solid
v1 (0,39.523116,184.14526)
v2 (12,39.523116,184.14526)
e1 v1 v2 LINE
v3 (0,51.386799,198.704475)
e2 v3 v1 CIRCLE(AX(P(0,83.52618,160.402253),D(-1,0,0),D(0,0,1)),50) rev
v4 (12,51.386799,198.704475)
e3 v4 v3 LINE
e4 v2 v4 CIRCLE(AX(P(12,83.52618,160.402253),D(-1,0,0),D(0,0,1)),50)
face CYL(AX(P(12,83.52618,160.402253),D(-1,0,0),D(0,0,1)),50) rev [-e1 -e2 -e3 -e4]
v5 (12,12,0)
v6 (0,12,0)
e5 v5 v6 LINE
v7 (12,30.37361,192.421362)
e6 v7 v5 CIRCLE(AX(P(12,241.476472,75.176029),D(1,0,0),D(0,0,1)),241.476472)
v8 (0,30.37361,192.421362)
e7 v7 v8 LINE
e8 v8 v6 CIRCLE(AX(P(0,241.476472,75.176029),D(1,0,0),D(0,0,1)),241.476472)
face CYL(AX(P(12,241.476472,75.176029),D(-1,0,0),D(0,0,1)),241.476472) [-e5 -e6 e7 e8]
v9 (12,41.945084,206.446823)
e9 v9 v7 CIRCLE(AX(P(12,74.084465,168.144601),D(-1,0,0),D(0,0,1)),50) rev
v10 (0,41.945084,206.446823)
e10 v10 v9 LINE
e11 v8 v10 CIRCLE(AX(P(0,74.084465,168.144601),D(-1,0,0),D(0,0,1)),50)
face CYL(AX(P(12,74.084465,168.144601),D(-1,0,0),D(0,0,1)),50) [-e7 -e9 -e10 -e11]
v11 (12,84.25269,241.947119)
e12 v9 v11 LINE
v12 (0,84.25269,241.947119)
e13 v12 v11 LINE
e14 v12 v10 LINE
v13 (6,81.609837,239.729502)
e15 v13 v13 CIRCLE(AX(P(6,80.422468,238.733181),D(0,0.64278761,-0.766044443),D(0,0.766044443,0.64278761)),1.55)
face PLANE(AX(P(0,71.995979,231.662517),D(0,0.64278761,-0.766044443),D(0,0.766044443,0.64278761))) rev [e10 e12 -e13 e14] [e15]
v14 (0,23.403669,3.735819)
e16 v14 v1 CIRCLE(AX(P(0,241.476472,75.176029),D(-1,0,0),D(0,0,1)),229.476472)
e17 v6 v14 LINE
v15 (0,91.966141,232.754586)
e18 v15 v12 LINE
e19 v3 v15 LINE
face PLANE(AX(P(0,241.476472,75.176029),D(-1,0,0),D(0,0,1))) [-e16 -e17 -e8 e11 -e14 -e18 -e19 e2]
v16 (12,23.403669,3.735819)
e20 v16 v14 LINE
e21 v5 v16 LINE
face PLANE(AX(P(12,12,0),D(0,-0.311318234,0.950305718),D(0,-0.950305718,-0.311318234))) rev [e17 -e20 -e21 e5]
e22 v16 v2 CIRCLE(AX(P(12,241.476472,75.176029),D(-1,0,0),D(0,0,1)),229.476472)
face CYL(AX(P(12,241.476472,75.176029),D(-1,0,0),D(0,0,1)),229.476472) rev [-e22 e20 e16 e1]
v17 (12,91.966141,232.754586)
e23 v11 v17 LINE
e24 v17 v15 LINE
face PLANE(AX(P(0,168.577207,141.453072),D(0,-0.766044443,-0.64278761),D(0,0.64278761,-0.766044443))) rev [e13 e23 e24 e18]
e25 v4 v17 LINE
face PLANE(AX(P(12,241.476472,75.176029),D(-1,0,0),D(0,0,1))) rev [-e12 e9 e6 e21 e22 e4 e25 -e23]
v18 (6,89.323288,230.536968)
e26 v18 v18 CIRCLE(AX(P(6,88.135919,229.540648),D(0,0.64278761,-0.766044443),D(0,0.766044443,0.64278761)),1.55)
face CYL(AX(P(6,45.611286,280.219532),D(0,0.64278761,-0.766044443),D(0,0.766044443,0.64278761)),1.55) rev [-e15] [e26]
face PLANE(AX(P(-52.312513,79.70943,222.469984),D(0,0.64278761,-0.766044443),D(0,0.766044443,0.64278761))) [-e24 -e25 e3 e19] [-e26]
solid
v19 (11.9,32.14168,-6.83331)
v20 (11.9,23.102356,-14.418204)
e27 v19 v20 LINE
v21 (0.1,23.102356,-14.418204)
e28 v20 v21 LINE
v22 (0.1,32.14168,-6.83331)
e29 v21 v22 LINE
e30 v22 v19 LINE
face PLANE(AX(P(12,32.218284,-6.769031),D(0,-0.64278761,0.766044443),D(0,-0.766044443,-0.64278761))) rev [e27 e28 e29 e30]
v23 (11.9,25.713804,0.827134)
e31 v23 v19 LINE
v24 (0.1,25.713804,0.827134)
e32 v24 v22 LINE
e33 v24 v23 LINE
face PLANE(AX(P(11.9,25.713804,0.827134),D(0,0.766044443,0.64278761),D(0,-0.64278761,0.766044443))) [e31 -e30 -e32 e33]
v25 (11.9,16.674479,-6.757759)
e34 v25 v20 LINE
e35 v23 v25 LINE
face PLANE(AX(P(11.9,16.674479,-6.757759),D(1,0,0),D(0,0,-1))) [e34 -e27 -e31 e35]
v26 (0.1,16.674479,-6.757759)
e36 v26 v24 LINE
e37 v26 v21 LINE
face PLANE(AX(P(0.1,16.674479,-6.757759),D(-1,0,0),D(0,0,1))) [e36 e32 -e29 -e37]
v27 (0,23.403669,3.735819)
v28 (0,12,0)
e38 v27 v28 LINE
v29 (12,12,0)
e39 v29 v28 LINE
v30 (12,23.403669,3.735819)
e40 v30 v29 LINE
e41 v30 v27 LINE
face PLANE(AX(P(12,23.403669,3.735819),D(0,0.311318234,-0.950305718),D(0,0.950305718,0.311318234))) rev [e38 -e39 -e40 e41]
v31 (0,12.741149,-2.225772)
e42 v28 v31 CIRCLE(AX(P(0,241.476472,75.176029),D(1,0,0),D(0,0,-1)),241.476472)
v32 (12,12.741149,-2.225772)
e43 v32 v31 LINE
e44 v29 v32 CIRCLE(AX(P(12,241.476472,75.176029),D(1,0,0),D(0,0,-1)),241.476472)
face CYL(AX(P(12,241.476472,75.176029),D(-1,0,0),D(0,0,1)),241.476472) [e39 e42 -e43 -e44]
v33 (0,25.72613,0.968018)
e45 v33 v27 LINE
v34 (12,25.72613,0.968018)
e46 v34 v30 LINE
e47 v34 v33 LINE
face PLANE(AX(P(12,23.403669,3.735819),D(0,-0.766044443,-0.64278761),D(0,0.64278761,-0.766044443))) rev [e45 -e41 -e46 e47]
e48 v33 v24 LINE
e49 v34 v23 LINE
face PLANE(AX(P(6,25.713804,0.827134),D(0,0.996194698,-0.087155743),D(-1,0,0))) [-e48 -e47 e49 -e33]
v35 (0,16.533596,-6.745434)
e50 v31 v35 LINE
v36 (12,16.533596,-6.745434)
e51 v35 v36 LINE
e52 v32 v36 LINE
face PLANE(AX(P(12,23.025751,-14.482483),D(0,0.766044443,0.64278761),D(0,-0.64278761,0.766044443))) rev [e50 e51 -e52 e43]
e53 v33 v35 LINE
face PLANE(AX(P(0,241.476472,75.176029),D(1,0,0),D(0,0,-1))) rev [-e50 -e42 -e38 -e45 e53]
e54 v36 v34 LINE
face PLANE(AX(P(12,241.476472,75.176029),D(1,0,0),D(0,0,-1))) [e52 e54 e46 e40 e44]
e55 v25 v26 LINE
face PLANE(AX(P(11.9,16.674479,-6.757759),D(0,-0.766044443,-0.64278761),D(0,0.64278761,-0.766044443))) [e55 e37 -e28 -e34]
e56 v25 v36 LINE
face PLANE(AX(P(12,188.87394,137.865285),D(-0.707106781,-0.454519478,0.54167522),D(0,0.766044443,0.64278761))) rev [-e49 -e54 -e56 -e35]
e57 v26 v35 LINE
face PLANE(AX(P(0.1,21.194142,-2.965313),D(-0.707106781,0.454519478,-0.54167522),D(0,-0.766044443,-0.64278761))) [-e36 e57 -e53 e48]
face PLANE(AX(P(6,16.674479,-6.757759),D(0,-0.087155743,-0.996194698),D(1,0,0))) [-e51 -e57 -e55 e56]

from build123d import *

# Parameters (mm, degrees)
AUFSATZ_LINEAR_AUSTRAGEN1_DEPTH = 12
AUFSATZ_LINEAR_AUSTRAGEN3_DEPTH = 12
AUFSATZ_LINEAR_AUSTRAGEN4_DEPTH = 12
SCHNITT_LINEAR_AUSTRAGEN1_DEPTH = 254.175024926
VERRUNDUNG1_R                   = 50
SKIZZE9_W                       = 12
SKIZZE9_H                       = 12
AUFSATZ_LINEAR_AUSTRAGEN6_DEPTH = 16
SKIZZE10_R                      = 9.036348878
SKIZZE10_W                      = 11.8
SKIZZE10_H                      = 11.8
SCHNITT_LINEAR_AUSTRAGEN3_DEPTH = 10
SKIZZE11_R                      = 1.55
SCHNITT_LINEAR_AUSTRAGEN4_DEPTH = 227.398704326
FASE1_SIZE                      = 0.1


with BuildPart() as part:
    # Skizze1 → Aufsatz-Linear austragen1 (new body)
    with BuildSketch(Plane(origin=(0, 0, 0), x_dir=(0, 0, -1), z_dir=(1, 0, 0))):
        with BuildLine():
            Line((-240, 65), (-230.735708163, 72.773663864))
            ThreePointArc((-230.735708163, 72.773663864), (-123.944567763, 17.242039243), (-3.735818811, 23.403668612))
            Line((-3.735818811, 23.403668612), (0, 12))
            ThreePointArc((0, 12), (-127.247502729, 5.681119716), (-240, 65))
        make_face()
    extrude(amount=AUFSATZ_LINEAR_AUSTRAGEN1_DEPTH)

    # Skizze5 → Aufsatz-Linear austragen4 (add)
    with BuildSketch(Plane(origin=(12, 0, 0), x_dir=(0, 0, -1), z_dir=(1, 0, 0))):
        Polygon((-231.662517154, 71.995978781), (-222.469983836, 79.709430098), (-210.899806862, 65.920630121), (-192.948331238, 44.526894555), (-220.092340179, 58.207178805), align=None)
    extrude(amount=-AUFSATZ_LINEAR_AUSTRAGEN4_DEPTH)

    # Skizze6 → Schnitt-Linear austragen1 (cut, through all)
    with BuildSketch(Plane(origin=(12, 0, 0), x_dir=(0, 0, -1), z_dir=(1, 0, 0))):
        Polygon((-231.662517154, 71.995978781), (-199.510648028, 33.678873242), (-204.367668784, 29.603348917), (-240, 65), align=None)
    extrude(amount=-SCHNITT_LINEAR_AUSTRAGEN1_DEPTH, mode=Mode.SUBTRACT)

    # Verrundung1
    verrundung1_edges = [part.edges().sort_by_distance(p)[0] for p in [
        (6, 44.526894555, 192.948331238),
        (6, 35.285406895, 200.858689823),
    ]]
    fillet(verrundung1_edges, radius=VERRUNDUNG1_R)

    # Skizze9 → Aufsatz-Linear austragen6 (add)
    with BuildSketch(Plane(origin=(0, 156.320496136, 131.168470653), x_dir=(1, 0, 0), z_dir=(0, 0.7660444431189836, 0.6427876096865328))):
        with Locations((6, -125.185660837)):
            Rectangle(SKIZZE9_W, SKIZZE9_H)
    extrude(amount=AUFSATZ_LINEAR_AUSTRAGEN6_DEPTH)

    # Skizze11 → Schnitt-Linear austragen4 (cut, through all)
    with BuildSketch(Plane(origin=(0, -76.611066038, 91.301513183), x_dir=(-1, 0, 0), z_dir=(0, 0.6427876096865329, -0.7660444431189836))):
        with Locations(Location((-6, 215.061915128, 0), (0, 0, 90))):
            Circle(SKIZZE11_R)
    extrude(amount=-SCHNITT_LINEAR_AUSTRAGEN4_DEPTH, mode=Mode.SUBTRACT)


with BuildPart() as body_2:
    # Skizze4 → Aufsatz-Linear austragen3 (new body)
    with BuildSketch(Plane(origin=(0, 0, 0), x_dir=(0, 0, -1), z_dir=(1, 0, 0))):
        with BuildLine():
            Line((-3.735818811, 23.403668612), (6.769031275, 32.218284445))
            Line((6.769031275, 32.218284445), (14.482482591, 23.025751128))
            Line((14.482482591, 23.025751128), (2.225771501, 12.741149373))
            ThreePointArc((2.225771501, 12.741149373), (1.113785782, 12.367871772), (0, 12))
            Line((0, 12), (-3.735818811, 23.403668612))
        make_face()
    extrude(amount=AUFSATZ_LINEAR_AUSTRAGEN3_DEPTH)

    # Skizze10 → Schnitt-Linear austragen3 (cut)
    with BuildSketch(Plane(origin=(0, 16.644916272, -19.836638765), x_dir=(-1, 0, 0), z_dir=(0, 0.6427876096865353, -0.7660444431189815))):
        with Locations((-6, 14.329588333)):
            Circle(SKIZZE10_R)
        with Locations((-6, 14.329588333)):
            Rectangle(SKIZZE10_W, SKIZZE10_H, mode=Mode.SUBTRACT)
    extrude(amount=-SCHNITT_LINEAR_AUSTRAGEN3_DEPTH, mode=Mode.SUBTRACT)

    # Fase1
    fase1_edges = [body_2.edges().sort_by_distance(p)[0] for p in [
        (0, 21.194141689, -2.965312502),
        (6, 16.597875031, -6.82203816),
        (6, 25.790408348, 0.891413156),
        (12, 21.194141689, -2.965312502),
    ]]
    chamfer(fase1_edges, length=FASE1_SIZE - 0.0001)  # a hair under: the kernel refuses the full size


solid = Compound([part.part, body_2.part])
